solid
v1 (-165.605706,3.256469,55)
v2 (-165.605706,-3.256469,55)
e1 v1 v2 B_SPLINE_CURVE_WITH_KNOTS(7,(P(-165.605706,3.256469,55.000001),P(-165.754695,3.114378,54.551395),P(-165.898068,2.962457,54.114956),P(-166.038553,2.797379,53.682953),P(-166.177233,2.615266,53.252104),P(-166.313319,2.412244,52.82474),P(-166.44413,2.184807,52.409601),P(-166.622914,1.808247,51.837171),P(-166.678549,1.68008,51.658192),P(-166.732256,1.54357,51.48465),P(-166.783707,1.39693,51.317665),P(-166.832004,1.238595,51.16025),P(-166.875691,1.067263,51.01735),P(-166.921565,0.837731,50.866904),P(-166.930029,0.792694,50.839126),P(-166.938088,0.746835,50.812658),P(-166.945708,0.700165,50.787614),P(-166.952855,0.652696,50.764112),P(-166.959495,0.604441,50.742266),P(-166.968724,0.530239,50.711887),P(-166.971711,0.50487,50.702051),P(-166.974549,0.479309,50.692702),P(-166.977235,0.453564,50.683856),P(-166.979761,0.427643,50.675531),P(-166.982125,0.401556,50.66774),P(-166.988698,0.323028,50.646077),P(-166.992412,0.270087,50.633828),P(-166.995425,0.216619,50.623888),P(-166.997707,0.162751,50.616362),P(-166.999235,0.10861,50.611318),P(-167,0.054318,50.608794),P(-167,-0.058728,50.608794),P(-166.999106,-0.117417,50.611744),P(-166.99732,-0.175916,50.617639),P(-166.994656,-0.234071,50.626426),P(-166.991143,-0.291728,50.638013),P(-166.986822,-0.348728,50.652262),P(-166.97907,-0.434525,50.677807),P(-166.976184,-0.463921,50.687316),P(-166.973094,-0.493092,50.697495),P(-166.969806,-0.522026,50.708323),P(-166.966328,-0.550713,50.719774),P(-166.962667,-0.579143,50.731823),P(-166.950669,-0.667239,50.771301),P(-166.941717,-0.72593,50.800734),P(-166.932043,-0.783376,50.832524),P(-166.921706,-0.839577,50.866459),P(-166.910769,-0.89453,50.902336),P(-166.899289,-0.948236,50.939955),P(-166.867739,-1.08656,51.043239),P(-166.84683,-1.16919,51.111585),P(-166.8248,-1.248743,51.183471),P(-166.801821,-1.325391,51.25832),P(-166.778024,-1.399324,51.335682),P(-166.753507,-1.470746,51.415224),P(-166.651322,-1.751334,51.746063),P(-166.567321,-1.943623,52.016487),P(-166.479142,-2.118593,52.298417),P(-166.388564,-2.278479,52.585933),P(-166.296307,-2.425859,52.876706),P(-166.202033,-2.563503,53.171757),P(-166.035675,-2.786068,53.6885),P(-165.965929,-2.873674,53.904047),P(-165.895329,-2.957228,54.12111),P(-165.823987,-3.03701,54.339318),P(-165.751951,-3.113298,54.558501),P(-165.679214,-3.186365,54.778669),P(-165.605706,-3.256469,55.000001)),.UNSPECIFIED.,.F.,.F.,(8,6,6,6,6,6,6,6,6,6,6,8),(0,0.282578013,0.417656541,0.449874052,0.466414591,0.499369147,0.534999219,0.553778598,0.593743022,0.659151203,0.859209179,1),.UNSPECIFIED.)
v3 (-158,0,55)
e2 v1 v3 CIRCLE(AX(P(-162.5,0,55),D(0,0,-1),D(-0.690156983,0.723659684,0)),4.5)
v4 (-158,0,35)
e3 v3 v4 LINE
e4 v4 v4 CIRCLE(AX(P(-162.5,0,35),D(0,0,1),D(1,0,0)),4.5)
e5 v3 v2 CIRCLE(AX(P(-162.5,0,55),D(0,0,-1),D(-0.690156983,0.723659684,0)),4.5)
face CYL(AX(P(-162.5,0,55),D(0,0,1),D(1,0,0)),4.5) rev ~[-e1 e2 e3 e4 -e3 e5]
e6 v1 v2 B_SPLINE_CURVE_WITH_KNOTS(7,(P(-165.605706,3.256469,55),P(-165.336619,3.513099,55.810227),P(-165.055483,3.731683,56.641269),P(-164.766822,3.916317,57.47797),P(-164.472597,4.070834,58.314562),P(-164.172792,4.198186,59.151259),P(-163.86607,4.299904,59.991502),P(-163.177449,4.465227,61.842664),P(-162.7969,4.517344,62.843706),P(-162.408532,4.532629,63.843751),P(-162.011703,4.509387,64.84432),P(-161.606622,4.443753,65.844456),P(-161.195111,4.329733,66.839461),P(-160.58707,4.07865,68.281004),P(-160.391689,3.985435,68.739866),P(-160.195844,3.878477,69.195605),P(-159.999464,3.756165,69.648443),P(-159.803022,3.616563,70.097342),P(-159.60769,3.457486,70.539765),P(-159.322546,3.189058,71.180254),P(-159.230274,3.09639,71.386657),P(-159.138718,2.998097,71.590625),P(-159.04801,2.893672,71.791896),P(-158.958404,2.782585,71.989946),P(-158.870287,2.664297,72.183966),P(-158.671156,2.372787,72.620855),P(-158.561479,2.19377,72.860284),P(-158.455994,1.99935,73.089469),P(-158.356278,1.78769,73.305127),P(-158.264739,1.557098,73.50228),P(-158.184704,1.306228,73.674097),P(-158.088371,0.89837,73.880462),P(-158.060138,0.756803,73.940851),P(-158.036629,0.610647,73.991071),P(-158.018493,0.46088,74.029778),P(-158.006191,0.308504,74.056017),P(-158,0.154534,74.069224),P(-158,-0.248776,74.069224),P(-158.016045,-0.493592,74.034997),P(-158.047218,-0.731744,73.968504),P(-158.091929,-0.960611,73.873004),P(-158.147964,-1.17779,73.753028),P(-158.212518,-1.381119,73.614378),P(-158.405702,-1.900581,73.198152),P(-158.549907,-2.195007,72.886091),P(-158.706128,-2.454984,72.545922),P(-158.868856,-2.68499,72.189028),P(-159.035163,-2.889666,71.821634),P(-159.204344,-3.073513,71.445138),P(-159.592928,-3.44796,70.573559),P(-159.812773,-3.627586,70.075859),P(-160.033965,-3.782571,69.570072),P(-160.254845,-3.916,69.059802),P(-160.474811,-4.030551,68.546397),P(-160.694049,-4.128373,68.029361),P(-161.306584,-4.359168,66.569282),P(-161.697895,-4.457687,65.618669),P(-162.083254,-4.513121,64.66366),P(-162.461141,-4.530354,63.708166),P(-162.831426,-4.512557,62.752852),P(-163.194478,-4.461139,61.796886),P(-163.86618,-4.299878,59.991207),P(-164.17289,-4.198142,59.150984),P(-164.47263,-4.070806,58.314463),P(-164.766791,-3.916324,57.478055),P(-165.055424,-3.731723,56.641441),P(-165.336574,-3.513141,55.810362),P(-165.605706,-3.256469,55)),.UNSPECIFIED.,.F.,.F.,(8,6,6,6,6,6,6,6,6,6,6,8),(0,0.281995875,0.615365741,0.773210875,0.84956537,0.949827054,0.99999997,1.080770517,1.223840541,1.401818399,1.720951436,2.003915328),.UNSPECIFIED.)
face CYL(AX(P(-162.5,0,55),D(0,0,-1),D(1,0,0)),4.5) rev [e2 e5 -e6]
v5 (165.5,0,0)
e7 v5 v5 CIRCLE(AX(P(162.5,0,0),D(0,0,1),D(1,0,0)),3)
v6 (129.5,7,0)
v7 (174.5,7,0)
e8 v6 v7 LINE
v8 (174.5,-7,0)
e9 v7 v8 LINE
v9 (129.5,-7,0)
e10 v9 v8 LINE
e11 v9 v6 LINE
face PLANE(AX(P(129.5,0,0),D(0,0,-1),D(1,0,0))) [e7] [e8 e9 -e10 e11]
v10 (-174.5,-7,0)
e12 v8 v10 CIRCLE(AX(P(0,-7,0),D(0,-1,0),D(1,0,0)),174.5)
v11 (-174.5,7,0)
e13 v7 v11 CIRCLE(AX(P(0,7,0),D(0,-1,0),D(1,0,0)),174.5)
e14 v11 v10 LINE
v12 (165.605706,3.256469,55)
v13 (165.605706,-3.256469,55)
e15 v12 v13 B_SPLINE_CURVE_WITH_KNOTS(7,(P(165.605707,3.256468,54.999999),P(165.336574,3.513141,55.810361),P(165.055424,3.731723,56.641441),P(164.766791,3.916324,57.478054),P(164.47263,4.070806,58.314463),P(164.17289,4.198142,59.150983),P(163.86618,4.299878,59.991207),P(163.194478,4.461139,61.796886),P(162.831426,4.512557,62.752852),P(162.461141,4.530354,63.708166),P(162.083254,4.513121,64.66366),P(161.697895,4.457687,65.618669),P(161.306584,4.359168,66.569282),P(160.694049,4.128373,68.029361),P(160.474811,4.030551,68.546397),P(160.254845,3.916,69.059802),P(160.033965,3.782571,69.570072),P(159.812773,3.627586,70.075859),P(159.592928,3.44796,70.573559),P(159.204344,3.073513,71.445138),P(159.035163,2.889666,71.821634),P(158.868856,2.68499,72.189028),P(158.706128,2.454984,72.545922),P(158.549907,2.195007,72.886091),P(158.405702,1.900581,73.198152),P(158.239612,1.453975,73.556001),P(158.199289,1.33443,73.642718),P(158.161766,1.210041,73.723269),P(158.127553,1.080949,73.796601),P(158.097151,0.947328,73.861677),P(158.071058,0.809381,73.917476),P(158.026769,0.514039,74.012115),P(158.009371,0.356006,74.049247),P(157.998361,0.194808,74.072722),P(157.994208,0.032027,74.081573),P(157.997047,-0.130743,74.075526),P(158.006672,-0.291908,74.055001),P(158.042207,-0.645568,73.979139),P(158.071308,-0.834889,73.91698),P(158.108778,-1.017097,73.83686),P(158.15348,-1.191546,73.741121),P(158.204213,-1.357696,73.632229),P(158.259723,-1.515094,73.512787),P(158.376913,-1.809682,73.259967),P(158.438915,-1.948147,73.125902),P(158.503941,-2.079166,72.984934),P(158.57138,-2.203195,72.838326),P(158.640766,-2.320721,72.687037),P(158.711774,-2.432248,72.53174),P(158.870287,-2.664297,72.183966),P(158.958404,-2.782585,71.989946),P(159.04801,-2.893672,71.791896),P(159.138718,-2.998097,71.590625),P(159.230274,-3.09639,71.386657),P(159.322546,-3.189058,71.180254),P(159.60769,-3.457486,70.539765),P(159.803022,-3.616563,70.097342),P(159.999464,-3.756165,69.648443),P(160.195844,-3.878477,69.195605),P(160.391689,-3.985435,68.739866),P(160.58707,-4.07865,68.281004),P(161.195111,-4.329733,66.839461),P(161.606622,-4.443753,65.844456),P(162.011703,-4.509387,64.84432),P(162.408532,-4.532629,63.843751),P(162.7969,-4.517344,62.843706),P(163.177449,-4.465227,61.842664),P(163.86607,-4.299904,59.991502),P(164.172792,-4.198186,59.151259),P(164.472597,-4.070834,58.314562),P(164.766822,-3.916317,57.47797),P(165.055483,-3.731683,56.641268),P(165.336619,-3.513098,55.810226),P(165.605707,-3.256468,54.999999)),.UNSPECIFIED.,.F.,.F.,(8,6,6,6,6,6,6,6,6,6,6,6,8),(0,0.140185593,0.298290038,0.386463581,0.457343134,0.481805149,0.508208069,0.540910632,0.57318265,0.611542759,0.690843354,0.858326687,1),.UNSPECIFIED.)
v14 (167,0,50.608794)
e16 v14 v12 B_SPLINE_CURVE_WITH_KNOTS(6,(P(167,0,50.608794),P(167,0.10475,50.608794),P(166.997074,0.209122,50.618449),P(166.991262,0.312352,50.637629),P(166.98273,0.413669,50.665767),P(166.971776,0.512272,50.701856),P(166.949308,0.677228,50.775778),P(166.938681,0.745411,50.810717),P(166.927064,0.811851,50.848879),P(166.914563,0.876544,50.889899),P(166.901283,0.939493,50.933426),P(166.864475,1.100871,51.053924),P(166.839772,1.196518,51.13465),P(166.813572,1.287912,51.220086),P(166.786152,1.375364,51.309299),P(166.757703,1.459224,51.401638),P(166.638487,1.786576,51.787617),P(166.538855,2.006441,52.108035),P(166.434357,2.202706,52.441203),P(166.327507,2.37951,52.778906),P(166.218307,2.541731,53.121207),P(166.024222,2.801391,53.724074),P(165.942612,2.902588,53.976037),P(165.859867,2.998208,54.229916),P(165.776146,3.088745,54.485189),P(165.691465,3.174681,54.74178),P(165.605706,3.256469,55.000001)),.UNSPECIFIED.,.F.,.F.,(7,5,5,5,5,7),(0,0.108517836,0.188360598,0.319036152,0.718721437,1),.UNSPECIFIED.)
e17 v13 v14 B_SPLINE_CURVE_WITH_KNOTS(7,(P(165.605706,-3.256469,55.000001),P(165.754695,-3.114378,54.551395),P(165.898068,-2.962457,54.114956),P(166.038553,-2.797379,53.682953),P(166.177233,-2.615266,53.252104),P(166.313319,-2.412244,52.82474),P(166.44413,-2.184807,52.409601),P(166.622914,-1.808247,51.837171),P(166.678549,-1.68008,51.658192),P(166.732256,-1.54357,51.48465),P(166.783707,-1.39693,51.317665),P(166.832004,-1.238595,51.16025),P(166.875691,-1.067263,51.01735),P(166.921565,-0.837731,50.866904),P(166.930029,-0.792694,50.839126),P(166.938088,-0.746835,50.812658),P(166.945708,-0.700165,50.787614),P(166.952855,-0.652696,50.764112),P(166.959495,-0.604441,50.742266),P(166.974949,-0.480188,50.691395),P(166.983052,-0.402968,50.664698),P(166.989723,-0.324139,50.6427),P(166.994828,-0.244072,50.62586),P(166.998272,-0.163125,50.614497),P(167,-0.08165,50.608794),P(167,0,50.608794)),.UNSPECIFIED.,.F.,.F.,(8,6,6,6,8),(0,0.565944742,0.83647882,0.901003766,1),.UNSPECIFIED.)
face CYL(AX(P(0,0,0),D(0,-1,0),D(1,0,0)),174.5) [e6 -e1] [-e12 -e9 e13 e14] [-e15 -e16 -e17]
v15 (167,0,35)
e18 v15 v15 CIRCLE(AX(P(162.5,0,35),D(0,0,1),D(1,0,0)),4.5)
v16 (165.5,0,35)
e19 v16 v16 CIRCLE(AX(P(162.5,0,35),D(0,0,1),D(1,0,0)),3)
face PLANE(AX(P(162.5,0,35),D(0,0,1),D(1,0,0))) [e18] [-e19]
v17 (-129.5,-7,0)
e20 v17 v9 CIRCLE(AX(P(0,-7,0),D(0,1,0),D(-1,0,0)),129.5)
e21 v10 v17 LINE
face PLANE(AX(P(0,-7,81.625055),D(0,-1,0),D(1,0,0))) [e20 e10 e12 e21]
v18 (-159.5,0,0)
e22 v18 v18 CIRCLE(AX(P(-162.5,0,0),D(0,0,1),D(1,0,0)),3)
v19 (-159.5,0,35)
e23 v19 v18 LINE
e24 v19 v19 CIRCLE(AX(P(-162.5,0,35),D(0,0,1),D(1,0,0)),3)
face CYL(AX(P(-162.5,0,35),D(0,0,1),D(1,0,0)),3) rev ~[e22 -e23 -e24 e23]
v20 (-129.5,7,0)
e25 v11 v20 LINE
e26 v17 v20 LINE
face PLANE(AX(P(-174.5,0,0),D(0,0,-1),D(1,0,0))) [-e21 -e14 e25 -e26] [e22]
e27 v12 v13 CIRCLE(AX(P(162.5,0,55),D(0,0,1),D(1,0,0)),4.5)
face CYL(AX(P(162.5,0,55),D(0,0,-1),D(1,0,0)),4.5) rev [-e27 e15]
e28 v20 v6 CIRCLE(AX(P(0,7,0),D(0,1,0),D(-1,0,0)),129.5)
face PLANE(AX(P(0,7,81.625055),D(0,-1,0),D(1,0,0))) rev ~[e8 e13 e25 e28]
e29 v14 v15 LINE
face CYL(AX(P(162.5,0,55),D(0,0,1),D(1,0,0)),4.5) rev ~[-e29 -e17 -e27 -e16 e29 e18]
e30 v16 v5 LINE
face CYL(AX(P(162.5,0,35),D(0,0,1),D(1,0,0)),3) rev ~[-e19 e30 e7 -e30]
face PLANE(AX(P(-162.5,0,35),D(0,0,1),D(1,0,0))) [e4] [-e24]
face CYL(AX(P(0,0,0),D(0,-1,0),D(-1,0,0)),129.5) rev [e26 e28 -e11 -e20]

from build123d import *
from build123d import SkipClean  # not in build123d's __all__

# Parameters (mm, degrees)
F1_DEPTH = 7
F2_DEPTH = 6
F4_R     = 4.5
F5_DEPTH = 119.501
F6_DEPTH = 20
F7_R     = 3
F8_DEPTH = 35.0010001


# Not quite as in the source:
# - after a boolean that leaves OpenCascade's solid faulty, fix() repairs it


with BuildPart() as f1:
    # F0 (on Front) → F1 (new body, symmetric)
    with BuildSketch(Plane.XZ):
        with BuildLine():
            Line((129.5, 0), (174.5, 0))
            ThreePointArc((174.5, 0), (0, 174.5), (-174.5, 0))
            Line((-174.5, 0), (-129.5, 0))
            ThreePointArc((-129.5, 0), (0, 129.5), (129.5, 0))
        make_face()
    extrude(amount=F1_DEPTH, both=True)

    # F0 (on Front) → F2 (join, symmetric)
    with BuildSketch(Plane.XZ):
        with BuildLine():
            Line((129.5, 0), (174.5, 0))
            ThreePointArc((174.5, 0), (0, 174.5), (-174.5, 0))
            Line((-174.5, 0), (-129.5, 0))
            ThreePointArc((-129.5, 0), (0, 129.5), (129.5, 0))
        make_face()
    extrude(amount=F2_DEPTH, both=True)

    # F4 (on offset) → F5 (cut, through all)
    with BuildSketch(Plane.XY.offset(55)):
        with Locations((-162.5, 0)):
            Circle(F4_R)
        with Locations((162.5, 0)):
            Circle(F4_R)
    extrude(amount=F5_DEPTH, mode=Mode.SUBTRACT)

    # F4 (on offset) → F6 (cut)
    with BuildSketch(Plane.XY.offset(55)):
        with Locations((-162.5, 0)):
            Circle(F4_R)
        with Locations((162.5, 0)):
            Circle(F4_R)
    with SkipClean():  # cleaning this boolean's faces spoils the solid; the shape is the same uncleaned
        extrude(amount=-F6_DEPTH, mode=Mode.SUBTRACT)

    # F7 (on face) → F8 (cut, through all)
    with BuildSketch(Plane.XY.offset(35)):
        with Locations((-162.5, 0)):
            Circle(F7_R)
        with Locations((162.5, 0)):
            Circle(F7_R)
    extrude(amount=-F8_DEPTH, mode=Mode.SUBTRACT)

    add(f1.part.fix(), mode=Mode.REPLACE)


solid = f1.part
